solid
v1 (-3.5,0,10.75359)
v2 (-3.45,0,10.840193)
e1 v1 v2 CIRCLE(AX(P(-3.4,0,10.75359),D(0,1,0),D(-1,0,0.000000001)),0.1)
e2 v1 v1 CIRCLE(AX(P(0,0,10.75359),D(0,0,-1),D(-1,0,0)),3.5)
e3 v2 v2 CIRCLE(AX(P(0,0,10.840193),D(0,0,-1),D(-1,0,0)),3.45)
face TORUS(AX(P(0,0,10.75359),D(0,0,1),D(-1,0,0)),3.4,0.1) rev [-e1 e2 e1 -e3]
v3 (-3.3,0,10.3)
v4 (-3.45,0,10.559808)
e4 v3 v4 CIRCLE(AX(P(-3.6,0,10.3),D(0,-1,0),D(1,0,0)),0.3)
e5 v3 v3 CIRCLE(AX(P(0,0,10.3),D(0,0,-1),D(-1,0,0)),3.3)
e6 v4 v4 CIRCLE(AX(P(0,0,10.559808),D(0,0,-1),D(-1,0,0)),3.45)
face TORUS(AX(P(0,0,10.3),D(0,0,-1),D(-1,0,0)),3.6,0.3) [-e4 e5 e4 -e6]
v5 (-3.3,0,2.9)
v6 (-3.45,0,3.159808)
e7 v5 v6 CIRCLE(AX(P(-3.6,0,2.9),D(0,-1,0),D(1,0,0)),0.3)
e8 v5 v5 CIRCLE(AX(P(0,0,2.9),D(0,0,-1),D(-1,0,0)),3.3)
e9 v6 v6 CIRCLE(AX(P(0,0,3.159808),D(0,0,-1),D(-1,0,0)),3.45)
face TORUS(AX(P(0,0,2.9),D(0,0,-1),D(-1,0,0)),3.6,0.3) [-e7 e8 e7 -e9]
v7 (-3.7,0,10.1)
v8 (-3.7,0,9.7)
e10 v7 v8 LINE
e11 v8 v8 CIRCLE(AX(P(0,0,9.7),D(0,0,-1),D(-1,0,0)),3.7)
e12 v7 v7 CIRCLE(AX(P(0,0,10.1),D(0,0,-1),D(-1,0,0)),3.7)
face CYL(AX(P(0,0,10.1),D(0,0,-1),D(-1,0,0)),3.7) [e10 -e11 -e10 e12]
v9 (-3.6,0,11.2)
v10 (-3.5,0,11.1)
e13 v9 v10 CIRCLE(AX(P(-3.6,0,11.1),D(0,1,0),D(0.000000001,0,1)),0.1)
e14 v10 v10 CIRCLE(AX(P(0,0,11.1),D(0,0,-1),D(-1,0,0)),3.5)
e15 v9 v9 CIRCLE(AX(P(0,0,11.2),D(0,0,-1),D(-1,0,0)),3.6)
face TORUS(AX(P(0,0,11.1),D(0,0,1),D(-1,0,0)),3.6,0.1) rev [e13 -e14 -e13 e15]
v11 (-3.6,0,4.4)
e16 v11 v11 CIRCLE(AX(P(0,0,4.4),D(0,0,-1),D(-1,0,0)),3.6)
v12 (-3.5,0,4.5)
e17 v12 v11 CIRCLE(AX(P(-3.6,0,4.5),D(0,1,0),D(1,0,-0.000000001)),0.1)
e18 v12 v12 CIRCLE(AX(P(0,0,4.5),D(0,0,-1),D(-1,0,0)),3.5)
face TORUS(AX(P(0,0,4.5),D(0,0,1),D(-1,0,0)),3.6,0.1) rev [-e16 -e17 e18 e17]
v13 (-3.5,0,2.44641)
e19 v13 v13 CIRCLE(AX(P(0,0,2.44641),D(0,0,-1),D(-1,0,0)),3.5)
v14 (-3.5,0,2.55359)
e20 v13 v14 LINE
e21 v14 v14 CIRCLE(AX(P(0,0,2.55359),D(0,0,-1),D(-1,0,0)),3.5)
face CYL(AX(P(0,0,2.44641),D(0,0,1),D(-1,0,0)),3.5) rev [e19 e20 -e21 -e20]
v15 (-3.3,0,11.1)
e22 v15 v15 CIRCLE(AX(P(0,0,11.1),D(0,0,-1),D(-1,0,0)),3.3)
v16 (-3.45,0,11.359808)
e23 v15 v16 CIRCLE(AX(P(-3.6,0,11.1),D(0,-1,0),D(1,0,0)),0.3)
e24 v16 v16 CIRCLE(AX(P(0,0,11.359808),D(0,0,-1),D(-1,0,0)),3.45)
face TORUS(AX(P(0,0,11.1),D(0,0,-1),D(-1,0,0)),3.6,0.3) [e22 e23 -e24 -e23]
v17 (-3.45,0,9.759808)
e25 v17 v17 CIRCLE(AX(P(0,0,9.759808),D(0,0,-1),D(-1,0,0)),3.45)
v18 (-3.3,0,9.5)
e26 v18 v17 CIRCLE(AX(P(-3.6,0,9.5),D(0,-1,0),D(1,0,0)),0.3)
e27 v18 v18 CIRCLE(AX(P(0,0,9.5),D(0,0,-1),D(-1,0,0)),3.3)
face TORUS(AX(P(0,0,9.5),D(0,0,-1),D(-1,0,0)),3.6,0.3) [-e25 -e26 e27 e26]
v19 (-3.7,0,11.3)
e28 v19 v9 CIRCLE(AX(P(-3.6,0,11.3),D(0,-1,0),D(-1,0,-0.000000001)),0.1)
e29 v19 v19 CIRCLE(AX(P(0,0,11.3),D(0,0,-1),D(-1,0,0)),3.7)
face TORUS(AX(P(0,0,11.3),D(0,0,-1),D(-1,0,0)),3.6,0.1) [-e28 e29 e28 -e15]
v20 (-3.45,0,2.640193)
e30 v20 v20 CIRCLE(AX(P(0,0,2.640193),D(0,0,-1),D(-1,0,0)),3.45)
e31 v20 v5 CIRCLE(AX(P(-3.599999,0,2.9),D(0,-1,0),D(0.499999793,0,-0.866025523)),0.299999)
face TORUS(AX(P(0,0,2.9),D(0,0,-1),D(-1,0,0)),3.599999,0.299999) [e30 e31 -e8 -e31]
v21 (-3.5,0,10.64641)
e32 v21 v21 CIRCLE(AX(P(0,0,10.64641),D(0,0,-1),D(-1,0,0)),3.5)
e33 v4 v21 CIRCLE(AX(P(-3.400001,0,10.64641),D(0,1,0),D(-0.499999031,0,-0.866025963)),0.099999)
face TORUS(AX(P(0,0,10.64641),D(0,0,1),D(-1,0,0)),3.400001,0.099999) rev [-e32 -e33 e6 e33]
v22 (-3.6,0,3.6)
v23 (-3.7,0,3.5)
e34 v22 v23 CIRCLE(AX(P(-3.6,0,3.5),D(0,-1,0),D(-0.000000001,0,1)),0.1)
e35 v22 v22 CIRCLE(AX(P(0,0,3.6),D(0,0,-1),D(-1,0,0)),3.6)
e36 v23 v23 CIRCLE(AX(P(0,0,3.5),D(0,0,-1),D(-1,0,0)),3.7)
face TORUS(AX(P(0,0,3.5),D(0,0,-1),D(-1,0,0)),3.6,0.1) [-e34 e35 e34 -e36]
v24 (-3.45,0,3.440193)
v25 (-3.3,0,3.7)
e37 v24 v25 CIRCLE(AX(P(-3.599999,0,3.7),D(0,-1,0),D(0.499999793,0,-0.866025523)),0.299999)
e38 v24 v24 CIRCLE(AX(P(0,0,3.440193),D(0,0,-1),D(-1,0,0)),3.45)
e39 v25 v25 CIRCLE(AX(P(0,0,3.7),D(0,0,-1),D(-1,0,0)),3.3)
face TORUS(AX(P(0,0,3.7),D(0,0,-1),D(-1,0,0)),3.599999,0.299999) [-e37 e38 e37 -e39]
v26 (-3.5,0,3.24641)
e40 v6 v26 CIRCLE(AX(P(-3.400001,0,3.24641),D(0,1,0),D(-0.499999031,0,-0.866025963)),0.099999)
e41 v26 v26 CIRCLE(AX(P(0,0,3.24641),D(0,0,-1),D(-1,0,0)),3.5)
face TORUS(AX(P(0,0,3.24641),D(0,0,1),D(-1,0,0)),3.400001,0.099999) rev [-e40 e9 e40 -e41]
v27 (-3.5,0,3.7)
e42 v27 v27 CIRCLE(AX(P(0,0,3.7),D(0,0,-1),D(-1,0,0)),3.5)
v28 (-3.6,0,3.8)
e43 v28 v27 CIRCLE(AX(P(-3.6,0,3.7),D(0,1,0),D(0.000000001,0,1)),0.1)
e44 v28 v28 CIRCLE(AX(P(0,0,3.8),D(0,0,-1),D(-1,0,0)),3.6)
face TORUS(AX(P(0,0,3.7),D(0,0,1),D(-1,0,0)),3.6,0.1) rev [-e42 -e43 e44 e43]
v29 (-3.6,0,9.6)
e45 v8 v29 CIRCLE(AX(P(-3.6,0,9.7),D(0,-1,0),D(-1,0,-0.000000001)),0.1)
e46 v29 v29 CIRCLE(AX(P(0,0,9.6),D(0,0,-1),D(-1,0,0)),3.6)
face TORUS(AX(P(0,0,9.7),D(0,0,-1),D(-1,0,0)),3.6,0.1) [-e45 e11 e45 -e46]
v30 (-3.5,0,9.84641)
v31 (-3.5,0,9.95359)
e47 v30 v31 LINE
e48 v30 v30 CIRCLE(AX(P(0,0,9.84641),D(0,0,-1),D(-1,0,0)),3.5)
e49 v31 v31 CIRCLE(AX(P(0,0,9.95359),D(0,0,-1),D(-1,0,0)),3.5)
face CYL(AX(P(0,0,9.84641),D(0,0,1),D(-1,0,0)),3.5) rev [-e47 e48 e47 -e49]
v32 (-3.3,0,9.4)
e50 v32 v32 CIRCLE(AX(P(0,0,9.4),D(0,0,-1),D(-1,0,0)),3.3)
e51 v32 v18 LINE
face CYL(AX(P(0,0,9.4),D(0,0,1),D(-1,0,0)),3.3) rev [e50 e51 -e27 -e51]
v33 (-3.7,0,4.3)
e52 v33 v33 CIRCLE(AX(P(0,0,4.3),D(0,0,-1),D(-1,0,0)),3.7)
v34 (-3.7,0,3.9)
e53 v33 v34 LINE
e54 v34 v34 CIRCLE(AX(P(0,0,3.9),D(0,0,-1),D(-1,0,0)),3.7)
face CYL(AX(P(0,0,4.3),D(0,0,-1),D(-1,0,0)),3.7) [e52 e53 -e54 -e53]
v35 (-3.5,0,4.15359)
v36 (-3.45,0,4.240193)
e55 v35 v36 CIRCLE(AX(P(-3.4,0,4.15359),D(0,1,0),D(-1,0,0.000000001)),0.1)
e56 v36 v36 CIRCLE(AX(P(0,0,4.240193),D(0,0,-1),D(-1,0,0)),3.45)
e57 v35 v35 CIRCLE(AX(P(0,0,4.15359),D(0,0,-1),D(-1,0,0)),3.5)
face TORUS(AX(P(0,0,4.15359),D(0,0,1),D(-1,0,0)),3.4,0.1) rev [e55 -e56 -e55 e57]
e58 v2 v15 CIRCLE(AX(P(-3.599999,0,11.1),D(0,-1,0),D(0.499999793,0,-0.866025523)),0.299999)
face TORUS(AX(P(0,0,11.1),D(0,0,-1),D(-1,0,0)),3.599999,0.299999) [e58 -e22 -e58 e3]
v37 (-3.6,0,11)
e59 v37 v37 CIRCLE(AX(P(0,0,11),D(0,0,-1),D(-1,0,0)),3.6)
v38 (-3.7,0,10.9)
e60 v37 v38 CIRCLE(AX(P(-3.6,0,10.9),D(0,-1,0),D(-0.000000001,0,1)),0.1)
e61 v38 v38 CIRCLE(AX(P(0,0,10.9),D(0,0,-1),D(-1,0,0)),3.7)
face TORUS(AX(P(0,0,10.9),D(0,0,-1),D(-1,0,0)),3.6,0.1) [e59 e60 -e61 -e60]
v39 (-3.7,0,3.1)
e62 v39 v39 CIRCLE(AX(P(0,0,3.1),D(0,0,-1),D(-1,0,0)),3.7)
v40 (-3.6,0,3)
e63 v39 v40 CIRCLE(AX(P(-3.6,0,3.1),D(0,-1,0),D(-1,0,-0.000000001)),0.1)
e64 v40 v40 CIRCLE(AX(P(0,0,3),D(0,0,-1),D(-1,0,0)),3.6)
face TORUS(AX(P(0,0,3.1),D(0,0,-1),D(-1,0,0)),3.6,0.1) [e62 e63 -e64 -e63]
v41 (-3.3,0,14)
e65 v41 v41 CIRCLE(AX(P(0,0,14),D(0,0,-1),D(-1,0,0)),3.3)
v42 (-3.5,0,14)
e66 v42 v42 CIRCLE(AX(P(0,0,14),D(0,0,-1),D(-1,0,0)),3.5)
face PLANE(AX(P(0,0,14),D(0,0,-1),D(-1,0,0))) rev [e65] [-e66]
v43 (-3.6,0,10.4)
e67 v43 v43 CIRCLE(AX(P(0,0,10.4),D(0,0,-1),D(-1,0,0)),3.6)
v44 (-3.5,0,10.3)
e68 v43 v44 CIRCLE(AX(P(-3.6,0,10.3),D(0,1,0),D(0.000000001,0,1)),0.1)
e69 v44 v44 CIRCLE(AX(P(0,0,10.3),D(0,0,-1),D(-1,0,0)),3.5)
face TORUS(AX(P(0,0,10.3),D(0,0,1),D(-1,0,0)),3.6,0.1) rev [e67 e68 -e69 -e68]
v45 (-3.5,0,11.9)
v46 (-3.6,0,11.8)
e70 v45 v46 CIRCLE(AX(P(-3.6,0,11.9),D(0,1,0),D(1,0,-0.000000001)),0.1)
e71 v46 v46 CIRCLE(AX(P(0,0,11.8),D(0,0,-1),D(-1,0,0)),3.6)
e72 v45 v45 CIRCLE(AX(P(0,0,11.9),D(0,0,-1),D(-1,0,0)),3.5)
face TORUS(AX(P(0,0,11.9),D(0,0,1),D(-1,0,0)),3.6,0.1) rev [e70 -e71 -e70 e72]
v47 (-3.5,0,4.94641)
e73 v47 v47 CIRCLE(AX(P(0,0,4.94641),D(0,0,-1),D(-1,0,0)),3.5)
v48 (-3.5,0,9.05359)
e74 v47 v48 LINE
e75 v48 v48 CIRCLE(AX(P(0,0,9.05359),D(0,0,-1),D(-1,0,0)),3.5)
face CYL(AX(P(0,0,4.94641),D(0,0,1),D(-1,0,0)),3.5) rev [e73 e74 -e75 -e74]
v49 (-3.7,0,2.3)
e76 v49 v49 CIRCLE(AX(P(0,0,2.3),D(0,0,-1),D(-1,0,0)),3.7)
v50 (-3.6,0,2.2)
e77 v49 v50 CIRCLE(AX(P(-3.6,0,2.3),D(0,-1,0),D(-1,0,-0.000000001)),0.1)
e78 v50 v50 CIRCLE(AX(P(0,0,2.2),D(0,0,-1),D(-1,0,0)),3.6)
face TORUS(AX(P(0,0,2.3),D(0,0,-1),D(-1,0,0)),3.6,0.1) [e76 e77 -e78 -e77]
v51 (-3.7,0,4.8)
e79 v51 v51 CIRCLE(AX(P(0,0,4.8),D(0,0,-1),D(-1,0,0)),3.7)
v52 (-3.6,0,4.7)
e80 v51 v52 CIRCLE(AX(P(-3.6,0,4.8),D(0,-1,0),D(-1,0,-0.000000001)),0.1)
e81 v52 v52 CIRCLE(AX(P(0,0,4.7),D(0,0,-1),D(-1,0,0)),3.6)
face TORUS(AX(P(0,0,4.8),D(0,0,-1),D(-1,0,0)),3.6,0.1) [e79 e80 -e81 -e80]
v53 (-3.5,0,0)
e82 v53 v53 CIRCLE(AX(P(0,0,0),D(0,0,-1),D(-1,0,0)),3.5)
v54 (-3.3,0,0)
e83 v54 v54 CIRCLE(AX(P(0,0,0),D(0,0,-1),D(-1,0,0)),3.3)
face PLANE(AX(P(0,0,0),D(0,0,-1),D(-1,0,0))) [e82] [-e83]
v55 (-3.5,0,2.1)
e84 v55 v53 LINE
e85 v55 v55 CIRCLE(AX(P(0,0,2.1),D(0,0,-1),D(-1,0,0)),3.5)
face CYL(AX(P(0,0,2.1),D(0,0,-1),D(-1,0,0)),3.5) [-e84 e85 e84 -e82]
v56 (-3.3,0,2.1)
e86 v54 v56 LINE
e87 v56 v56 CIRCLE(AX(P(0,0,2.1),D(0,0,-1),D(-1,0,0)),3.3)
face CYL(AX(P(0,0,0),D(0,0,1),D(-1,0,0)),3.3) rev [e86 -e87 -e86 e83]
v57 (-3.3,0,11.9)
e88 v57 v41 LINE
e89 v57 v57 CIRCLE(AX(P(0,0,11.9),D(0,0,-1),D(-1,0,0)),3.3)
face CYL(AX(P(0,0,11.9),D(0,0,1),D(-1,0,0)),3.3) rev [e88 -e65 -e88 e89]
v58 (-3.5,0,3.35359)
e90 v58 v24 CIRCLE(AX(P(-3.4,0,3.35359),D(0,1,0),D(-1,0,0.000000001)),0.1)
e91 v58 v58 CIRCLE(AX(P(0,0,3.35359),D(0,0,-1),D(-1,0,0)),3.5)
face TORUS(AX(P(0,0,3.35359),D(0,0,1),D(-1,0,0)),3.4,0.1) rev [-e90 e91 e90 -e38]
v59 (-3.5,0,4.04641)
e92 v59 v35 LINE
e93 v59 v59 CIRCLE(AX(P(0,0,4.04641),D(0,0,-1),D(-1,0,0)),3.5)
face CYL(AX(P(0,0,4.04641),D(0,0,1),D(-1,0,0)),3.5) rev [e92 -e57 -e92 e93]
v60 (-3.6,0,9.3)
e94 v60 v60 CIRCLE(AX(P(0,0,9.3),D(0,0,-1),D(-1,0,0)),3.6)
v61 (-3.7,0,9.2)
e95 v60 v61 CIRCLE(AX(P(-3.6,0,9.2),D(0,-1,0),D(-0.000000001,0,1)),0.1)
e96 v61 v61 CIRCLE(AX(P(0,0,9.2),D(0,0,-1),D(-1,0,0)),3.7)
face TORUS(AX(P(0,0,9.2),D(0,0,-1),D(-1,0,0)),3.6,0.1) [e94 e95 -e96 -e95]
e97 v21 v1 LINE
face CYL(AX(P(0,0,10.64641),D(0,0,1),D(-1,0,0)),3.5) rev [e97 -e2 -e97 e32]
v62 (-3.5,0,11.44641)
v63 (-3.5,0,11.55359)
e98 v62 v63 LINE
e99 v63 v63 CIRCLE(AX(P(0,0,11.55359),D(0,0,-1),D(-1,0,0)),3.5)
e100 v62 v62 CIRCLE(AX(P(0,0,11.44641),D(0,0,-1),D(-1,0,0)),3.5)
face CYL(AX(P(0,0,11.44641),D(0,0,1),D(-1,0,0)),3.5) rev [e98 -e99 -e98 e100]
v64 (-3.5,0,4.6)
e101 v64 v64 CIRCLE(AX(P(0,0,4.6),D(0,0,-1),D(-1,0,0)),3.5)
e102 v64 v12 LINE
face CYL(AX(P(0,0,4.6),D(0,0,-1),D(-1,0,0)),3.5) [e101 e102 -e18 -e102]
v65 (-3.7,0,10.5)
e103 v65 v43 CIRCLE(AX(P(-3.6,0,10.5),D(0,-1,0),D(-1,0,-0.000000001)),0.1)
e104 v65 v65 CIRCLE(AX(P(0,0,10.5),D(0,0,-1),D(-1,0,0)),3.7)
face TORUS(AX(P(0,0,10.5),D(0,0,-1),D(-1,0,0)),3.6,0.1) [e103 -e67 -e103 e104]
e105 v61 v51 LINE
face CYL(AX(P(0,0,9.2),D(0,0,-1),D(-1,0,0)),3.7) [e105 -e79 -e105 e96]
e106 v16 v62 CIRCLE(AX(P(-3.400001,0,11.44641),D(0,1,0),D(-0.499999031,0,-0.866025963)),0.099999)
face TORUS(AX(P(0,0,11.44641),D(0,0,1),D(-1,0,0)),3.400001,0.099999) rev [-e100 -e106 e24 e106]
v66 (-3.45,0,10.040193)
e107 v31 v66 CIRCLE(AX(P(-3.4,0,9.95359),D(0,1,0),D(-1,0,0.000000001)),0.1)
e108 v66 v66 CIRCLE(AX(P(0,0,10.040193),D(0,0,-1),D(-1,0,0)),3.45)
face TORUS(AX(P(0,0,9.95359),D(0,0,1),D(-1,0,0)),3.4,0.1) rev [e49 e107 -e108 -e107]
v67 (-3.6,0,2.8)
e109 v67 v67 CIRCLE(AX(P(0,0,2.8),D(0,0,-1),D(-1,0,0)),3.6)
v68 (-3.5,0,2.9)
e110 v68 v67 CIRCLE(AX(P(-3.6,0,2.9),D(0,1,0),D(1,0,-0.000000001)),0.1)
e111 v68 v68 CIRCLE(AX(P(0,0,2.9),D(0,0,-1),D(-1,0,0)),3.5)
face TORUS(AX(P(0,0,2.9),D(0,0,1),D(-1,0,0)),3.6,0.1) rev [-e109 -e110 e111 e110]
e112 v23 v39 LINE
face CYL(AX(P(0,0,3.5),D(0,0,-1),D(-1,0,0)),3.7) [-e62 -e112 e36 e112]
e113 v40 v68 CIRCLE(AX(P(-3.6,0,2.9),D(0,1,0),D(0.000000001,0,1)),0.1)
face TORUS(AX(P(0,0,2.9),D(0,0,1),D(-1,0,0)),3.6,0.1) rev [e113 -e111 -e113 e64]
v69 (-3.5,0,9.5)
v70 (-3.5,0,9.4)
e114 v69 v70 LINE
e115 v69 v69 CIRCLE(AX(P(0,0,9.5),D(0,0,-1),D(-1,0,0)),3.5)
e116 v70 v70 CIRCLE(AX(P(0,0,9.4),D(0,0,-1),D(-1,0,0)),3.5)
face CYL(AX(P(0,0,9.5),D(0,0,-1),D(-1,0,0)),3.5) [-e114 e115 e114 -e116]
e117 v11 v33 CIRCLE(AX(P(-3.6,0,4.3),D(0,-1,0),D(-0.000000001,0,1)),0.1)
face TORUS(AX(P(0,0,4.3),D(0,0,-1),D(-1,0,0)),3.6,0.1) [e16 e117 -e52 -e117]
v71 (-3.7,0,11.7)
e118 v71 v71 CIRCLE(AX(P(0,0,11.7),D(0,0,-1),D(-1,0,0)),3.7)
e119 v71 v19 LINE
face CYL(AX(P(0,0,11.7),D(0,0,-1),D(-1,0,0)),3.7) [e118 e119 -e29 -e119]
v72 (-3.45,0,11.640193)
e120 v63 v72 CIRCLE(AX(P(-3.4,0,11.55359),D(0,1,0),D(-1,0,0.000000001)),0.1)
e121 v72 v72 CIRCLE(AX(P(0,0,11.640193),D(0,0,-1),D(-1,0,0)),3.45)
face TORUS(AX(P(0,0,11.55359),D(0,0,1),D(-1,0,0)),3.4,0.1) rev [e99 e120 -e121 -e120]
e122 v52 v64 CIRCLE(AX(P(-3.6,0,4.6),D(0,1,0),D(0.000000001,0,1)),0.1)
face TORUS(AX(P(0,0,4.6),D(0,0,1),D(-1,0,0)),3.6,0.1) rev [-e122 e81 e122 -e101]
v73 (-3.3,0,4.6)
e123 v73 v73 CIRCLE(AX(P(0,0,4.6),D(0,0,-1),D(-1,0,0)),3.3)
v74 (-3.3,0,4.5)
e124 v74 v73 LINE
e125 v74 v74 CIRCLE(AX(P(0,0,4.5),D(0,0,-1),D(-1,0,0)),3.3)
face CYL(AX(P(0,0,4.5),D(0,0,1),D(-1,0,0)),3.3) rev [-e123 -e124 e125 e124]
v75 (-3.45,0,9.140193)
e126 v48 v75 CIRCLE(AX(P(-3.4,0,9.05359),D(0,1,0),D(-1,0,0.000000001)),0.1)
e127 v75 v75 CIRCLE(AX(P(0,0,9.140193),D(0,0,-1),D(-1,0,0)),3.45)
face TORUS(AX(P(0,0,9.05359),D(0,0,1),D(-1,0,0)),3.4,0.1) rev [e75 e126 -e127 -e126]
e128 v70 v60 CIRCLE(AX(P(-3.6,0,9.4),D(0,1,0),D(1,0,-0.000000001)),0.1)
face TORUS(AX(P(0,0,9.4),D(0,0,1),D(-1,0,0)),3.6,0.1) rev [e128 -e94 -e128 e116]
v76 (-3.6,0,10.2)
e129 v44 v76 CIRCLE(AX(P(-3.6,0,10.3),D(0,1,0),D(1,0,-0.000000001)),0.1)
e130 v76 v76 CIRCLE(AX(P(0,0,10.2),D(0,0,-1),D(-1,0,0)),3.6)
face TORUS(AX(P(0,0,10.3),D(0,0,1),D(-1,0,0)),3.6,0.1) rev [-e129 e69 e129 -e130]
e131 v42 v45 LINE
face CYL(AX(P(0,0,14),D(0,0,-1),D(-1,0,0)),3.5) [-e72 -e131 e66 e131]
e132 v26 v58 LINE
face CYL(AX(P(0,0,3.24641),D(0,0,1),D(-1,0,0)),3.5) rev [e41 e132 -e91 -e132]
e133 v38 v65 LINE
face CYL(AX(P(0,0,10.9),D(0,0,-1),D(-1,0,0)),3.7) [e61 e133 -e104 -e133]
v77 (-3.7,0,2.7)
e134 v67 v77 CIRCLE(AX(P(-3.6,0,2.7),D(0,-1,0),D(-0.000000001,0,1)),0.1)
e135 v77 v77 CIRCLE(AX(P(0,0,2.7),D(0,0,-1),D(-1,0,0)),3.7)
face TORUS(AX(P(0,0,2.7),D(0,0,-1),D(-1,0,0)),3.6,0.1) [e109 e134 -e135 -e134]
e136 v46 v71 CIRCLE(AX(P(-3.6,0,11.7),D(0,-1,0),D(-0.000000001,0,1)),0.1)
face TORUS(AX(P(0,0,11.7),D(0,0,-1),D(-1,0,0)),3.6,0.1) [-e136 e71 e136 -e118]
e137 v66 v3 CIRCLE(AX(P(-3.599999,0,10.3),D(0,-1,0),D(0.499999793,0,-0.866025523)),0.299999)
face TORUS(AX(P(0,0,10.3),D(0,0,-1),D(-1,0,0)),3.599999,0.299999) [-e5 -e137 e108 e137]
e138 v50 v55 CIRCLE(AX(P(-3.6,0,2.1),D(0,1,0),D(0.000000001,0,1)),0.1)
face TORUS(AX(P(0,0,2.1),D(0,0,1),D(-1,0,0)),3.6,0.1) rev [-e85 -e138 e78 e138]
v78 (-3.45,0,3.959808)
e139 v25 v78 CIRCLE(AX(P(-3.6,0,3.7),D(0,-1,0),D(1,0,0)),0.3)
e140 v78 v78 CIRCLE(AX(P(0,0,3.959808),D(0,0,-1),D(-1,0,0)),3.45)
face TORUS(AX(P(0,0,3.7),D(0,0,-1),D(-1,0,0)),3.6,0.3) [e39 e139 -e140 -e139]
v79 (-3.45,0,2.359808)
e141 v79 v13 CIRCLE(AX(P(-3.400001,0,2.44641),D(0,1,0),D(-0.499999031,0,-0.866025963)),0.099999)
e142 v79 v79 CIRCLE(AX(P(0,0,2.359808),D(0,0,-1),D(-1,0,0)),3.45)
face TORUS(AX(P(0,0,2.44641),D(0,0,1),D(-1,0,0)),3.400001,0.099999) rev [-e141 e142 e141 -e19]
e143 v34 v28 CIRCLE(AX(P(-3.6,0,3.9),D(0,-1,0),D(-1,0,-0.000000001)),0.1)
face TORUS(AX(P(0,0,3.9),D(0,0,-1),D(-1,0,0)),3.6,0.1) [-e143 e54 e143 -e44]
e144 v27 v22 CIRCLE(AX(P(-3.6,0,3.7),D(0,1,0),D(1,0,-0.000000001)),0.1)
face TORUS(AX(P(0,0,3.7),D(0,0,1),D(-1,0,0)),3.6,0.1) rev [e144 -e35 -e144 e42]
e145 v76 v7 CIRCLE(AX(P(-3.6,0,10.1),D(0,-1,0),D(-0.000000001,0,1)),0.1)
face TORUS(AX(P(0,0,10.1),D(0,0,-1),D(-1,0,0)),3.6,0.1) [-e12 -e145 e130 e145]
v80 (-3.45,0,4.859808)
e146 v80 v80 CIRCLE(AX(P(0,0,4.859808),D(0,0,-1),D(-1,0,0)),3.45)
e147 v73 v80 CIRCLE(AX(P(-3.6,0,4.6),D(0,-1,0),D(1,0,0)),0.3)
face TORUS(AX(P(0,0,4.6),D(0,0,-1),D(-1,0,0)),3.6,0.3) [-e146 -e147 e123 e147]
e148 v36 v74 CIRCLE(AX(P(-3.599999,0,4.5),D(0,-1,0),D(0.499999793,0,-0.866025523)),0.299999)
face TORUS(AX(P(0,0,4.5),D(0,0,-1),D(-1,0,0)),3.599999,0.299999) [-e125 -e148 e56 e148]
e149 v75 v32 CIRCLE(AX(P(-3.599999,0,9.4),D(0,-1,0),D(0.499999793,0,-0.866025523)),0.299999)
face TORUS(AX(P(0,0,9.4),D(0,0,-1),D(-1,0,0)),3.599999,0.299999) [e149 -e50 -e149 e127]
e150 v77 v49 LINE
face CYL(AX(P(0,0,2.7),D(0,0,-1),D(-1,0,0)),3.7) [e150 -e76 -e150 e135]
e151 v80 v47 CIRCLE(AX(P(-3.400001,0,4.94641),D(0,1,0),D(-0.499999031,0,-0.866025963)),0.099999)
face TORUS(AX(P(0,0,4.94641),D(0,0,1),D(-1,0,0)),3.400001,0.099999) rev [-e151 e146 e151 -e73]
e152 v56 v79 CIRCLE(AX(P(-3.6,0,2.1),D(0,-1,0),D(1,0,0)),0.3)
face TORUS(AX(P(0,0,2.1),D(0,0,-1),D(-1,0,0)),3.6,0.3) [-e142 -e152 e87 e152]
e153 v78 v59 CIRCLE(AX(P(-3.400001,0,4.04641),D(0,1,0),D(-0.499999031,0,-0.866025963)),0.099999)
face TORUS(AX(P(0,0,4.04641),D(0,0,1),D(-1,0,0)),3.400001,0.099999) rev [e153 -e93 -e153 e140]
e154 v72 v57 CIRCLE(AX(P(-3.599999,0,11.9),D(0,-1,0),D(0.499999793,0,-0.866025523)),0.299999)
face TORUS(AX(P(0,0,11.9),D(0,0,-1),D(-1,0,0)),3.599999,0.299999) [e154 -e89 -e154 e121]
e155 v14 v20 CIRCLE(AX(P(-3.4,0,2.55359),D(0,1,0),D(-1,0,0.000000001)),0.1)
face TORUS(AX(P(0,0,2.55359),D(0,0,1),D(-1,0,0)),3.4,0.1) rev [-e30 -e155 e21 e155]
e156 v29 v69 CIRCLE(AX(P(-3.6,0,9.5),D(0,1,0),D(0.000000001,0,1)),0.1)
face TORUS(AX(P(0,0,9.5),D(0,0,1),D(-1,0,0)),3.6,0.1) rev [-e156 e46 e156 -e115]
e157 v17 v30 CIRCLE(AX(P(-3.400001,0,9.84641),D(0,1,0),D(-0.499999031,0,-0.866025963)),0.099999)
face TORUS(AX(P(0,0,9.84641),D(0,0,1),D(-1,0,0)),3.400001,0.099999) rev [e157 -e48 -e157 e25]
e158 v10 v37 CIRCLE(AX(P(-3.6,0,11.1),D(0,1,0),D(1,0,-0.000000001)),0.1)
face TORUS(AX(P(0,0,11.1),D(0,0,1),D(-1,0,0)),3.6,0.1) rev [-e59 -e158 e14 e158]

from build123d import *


# Not quite as in the source:
# - ends of sketch curves that miss each other by under 0.0002 mm in the source are joined


with BuildPart() as f1:
    # F0 (on Front) → F1 (revolve)
    with BuildSketch(Plane.XZ):
        with BuildLine():
            Line((-3.5, 2), (-3.5, 0))
            Line((-3.5, 0), (-3.3, 0))
            Line((-3.3, 0), (-3.3, 2.1))
            ThreePointArc((-3.3, 2.1), (-3.3401924262, 2.250000082), (-3.4500001641, 2.3598077159))
            ThreePointArc((-3.4500001641, 2.3598077159), (-3.4866026079, 2.396410117), (-3.5, 2.44641))
            Line((-3.5, 2.44641), (-3.5, 2.55359))
            ThreePointArc((-3.5, 2.55359), (-3.4866024829, 2.6035900995), (-3.449999801, 2.6401926553))
            ThreePointArc((-3.449999801, 2.6401926553), (-3.3401923012, 2.7500001345), (-3.3, 2.9))
            ThreePointArc((-3.3, 2.9), (-3.3401924262, 3.050000082), (-3.4500001641, 3.1598077159))
            ThreePointArc((-3.4500001641, 3.1598077159), (-3.4866026079, 3.196410117), (-3.5, 3.24641))
            Line((-3.5, 3.24641), (-3.5, 3.35359))
            ThreePointArc((-3.5, 3.35359), (-3.4866024829, 3.4035900995), (-3.449999801, 3.4401926553))
            ThreePointArc((-3.449999801, 3.4401926553), (-3.3401923012, 3.5500001345), (-3.3, 3.7))
            ThreePointArc((-3.3, 3.7), (-3.3401924262, 3.850000082), (-3.4500001641, 3.9598077159))
            ThreePointArc((-3.4500001641, 3.9598077159), (-3.4866026079, 3.996410117), (-3.5, 4.04641))
            Line((-3.5, 4.04641), (-3.5, 4.15359))
            ThreePointArc((-3.5, 4.15359), (-3.4866024829, 4.2035900995), (-3.449999801, 4.2401926553))
            ThreePointArc((-3.449999801, 4.2401926553), (-3.3401923012, 4.3500001345), (-3.3, 4.5))
            Line((-3.3, 4.5), (-3.3, 4.6))
            ThreePointArc((-3.3, 4.6), (-3.3401924262, 4.750000082), (-3.4500001641, 4.8598077159))
            ThreePointArc((-3.4500001641, 4.8598077159), (-3.4866026079, 4.896410117), (-3.5, 4.94641))
            Line((-3.5, 4.94641), (-3.5, 9.05359))
            ThreePointArc((-3.5, 9.05359), (-3.4866024829, 9.1035900995), (-3.449999801, 9.1401926553))
            ThreePointArc((-3.449999801, 9.1401926553), (-3.3401923012, 9.2500001345), (-3.3, 9.4))
            Line((-3.3, 9.4), (-3.3, 9.5))
            ThreePointArc((-3.3, 9.5), (-3.3401924262, 9.650000082), (-3.4500001641, 9.7598077159))
            ThreePointArc((-3.4500001641, 9.7598077159), (-3.4866026079, 9.796410117), (-3.5, 9.84641))
            Line((-3.5, 9.84641), (-3.5, 9.95359))
            ThreePointArc((-3.5, 9.95359), (-3.4866024829, 10.0035900995), (-3.449999801, 10.0401926553))
            ThreePointArc((-3.449999801, 10.0401926553), (-3.3401923012, 10.1500001345), (-3.3, 10.3))
            ThreePointArc((-3.3, 10.3), (-3.3401924262, 10.450000082), (-3.4500001641, 10.5598077159))
            ThreePointArc((-3.4500001641, 10.5598077159), (-3.4866026079, 10.596410117), (-3.5, 10.64641))
            Line((-3.5, 10.64641), (-3.5, 10.75359))
            ThreePointArc((-3.5, 10.75359), (-3.4866024829, 10.8035900995), (-3.449999801, 10.8401926553))
            ThreePointArc((-3.449999801, 10.8401926553), (-3.3401923012, 10.9500001345), (-3.3, 11.1))
            ThreePointArc((-3.3, 11.1), (-3.3401924262, 11.250000082), (-3.4500001641, 11.3598077159))
            ThreePointArc((-3.4500001641, 11.3598077159), (-3.4866026079, 11.396410117), (-3.5, 11.44641))
            Line((-3.5, 11.44641), (-3.5, 11.55359))
            ThreePointArc((-3.5, 11.55359), (-3.4866024829, 11.6035900995), (-3.449999801, 11.6401926553))
            ThreePointArc((-3.449999801, 11.6401926553), (-3.3401923012, 11.7500001345), (-3.3, 11.9))
            Line((-3.3, 11.9), (-3.3, 14))
            Line((-3.3, 14), (-3.5, 14))
            Line((-3.5, 14), (-3.5, 12))
            Line((-3.5, 12), (-3.5, 11.9))
            ThreePointArc((-3.5, 11.9), (-3.5292893219, 11.8292893219), (-3.6, 11.8))
            ThreePointArc((-3.6, 11.8), (-3.6707106781, 11.7707106781), (-3.7, 11.7))
            Line((-3.7, 11.7), (-3.7, 11.3))
            ThreePointArc((-3.7, 11.3), (-3.6707106781, 11.2292893219), (-3.6, 11.2))
            ThreePointArc((-3.6, 11.2), (-3.5292893219, 11.1707106781), (-3.5, 11.1))
            ThreePointArc((-3.5, 11.1), (-3.5292893219, 11.0292893219), (-3.6, 11))
            ThreePointArc((-3.6, 11), (-3.6707106781, 10.9707106781), (-3.7, 10.9))
            Line((-3.7, 10.9), (-3.7, 10.5))
            ThreePointArc((-3.7, 10.5), (-3.6707106781, 10.4292893219), (-3.6, 10.4))
            ThreePointArc((-3.6, 10.4), (-3.5292893219, 10.3707106781), (-3.5, 10.3))
            ThreePointArc((-3.5, 10.3), (-3.5292893219, 10.2292893219), (-3.6, 10.2))
            ThreePointArc((-3.6, 10.2), (-3.6707106781, 10.1707106781), (-3.7, 10.1))
            Line((-3.7, 10.1), (-3.7, 9.7))
            ThreePointArc((-3.7, 9.7), (-3.6707106781, 9.6292893219), (-3.6, 9.6))
            ThreePointArc((-3.6, 9.6), (-3.5292893219, 9.5707106781), (-3.5, 9.5))
            Line((-3.5, 9.5), (-3.5, 9.4))
            ThreePointArc((-3.5, 9.4), (-3.5292893219, 9.3292893219), (-3.6, 9.3))
            ThreePointArc((-3.6, 9.3), (-3.6707106781, 9.2707106781), (-3.7, 9.2))
            Line((-3.7, 9.2), (-3.7, 4.8))
            ThreePointArc((-3.7, 4.8), (-3.6707106781, 4.7292893219), (-3.6, 4.7))
            ThreePointArc((-3.6, 4.7), (-3.5292893219, 4.6707106781), (-3.5, 4.6))
            Line((-3.5, 4.6), (-3.5, 4.5))
            ThreePointArc((-3.5, 4.5), (-3.5292893219, 4.4292893219), (-3.6, 4.4))
            ThreePointArc((-3.6, 4.4), (-3.6707106781, 4.3707106781), (-3.7, 4.3))
            Line((-3.7, 4.3), (-3.7, 3.9))
            ThreePointArc((-3.7, 3.9), (-3.6707106781, 3.8292893219), (-3.6, 3.8))
            ThreePointArc((-3.6, 3.8), (-3.5292893219, 3.7707106781), (-3.5, 3.7))
            ThreePointArc((-3.5, 3.7), (-3.5292893219, 3.6292893219), (-3.6, 3.6))
            ThreePointArc((-3.6, 3.6), (-3.6707106781, 3.5707106781), (-3.7, 3.5))
            Line((-3.7, 3.5), (-3.7, 3.1))
            ThreePointArc((-3.7, 3.1), (-3.6707106781, 3.0292893219), (-3.6, 3))
            ThreePointArc((-3.6, 3), (-3.5292893219, 2.9707106781), (-3.5, 2.9))
            ThreePointArc((-3.5, 2.9), (-3.5292893219, 2.8292893219), (-3.6, 2.8))
            ThreePointArc((-3.6, 2.8), (-3.6707106781, 2.7707106781), (-3.7, 2.7))
            Line((-3.7, 2.7), (-3.7, 2.3))
            ThreePointArc((-3.7, 2.3), (-3.6707106781, 2.2292893219), (-3.6, 2.2))
            ThreePointArc((-3.6, 2.2), (-3.5292893219, 2.1707106781), (-3.5, 2.1))
            Line((-3.5, 2.1), (-3.5, 2))
        make_face()
    revolve(axis=Axis((0, 0, 0), (0, 0, -1)))


solid = f1.part
